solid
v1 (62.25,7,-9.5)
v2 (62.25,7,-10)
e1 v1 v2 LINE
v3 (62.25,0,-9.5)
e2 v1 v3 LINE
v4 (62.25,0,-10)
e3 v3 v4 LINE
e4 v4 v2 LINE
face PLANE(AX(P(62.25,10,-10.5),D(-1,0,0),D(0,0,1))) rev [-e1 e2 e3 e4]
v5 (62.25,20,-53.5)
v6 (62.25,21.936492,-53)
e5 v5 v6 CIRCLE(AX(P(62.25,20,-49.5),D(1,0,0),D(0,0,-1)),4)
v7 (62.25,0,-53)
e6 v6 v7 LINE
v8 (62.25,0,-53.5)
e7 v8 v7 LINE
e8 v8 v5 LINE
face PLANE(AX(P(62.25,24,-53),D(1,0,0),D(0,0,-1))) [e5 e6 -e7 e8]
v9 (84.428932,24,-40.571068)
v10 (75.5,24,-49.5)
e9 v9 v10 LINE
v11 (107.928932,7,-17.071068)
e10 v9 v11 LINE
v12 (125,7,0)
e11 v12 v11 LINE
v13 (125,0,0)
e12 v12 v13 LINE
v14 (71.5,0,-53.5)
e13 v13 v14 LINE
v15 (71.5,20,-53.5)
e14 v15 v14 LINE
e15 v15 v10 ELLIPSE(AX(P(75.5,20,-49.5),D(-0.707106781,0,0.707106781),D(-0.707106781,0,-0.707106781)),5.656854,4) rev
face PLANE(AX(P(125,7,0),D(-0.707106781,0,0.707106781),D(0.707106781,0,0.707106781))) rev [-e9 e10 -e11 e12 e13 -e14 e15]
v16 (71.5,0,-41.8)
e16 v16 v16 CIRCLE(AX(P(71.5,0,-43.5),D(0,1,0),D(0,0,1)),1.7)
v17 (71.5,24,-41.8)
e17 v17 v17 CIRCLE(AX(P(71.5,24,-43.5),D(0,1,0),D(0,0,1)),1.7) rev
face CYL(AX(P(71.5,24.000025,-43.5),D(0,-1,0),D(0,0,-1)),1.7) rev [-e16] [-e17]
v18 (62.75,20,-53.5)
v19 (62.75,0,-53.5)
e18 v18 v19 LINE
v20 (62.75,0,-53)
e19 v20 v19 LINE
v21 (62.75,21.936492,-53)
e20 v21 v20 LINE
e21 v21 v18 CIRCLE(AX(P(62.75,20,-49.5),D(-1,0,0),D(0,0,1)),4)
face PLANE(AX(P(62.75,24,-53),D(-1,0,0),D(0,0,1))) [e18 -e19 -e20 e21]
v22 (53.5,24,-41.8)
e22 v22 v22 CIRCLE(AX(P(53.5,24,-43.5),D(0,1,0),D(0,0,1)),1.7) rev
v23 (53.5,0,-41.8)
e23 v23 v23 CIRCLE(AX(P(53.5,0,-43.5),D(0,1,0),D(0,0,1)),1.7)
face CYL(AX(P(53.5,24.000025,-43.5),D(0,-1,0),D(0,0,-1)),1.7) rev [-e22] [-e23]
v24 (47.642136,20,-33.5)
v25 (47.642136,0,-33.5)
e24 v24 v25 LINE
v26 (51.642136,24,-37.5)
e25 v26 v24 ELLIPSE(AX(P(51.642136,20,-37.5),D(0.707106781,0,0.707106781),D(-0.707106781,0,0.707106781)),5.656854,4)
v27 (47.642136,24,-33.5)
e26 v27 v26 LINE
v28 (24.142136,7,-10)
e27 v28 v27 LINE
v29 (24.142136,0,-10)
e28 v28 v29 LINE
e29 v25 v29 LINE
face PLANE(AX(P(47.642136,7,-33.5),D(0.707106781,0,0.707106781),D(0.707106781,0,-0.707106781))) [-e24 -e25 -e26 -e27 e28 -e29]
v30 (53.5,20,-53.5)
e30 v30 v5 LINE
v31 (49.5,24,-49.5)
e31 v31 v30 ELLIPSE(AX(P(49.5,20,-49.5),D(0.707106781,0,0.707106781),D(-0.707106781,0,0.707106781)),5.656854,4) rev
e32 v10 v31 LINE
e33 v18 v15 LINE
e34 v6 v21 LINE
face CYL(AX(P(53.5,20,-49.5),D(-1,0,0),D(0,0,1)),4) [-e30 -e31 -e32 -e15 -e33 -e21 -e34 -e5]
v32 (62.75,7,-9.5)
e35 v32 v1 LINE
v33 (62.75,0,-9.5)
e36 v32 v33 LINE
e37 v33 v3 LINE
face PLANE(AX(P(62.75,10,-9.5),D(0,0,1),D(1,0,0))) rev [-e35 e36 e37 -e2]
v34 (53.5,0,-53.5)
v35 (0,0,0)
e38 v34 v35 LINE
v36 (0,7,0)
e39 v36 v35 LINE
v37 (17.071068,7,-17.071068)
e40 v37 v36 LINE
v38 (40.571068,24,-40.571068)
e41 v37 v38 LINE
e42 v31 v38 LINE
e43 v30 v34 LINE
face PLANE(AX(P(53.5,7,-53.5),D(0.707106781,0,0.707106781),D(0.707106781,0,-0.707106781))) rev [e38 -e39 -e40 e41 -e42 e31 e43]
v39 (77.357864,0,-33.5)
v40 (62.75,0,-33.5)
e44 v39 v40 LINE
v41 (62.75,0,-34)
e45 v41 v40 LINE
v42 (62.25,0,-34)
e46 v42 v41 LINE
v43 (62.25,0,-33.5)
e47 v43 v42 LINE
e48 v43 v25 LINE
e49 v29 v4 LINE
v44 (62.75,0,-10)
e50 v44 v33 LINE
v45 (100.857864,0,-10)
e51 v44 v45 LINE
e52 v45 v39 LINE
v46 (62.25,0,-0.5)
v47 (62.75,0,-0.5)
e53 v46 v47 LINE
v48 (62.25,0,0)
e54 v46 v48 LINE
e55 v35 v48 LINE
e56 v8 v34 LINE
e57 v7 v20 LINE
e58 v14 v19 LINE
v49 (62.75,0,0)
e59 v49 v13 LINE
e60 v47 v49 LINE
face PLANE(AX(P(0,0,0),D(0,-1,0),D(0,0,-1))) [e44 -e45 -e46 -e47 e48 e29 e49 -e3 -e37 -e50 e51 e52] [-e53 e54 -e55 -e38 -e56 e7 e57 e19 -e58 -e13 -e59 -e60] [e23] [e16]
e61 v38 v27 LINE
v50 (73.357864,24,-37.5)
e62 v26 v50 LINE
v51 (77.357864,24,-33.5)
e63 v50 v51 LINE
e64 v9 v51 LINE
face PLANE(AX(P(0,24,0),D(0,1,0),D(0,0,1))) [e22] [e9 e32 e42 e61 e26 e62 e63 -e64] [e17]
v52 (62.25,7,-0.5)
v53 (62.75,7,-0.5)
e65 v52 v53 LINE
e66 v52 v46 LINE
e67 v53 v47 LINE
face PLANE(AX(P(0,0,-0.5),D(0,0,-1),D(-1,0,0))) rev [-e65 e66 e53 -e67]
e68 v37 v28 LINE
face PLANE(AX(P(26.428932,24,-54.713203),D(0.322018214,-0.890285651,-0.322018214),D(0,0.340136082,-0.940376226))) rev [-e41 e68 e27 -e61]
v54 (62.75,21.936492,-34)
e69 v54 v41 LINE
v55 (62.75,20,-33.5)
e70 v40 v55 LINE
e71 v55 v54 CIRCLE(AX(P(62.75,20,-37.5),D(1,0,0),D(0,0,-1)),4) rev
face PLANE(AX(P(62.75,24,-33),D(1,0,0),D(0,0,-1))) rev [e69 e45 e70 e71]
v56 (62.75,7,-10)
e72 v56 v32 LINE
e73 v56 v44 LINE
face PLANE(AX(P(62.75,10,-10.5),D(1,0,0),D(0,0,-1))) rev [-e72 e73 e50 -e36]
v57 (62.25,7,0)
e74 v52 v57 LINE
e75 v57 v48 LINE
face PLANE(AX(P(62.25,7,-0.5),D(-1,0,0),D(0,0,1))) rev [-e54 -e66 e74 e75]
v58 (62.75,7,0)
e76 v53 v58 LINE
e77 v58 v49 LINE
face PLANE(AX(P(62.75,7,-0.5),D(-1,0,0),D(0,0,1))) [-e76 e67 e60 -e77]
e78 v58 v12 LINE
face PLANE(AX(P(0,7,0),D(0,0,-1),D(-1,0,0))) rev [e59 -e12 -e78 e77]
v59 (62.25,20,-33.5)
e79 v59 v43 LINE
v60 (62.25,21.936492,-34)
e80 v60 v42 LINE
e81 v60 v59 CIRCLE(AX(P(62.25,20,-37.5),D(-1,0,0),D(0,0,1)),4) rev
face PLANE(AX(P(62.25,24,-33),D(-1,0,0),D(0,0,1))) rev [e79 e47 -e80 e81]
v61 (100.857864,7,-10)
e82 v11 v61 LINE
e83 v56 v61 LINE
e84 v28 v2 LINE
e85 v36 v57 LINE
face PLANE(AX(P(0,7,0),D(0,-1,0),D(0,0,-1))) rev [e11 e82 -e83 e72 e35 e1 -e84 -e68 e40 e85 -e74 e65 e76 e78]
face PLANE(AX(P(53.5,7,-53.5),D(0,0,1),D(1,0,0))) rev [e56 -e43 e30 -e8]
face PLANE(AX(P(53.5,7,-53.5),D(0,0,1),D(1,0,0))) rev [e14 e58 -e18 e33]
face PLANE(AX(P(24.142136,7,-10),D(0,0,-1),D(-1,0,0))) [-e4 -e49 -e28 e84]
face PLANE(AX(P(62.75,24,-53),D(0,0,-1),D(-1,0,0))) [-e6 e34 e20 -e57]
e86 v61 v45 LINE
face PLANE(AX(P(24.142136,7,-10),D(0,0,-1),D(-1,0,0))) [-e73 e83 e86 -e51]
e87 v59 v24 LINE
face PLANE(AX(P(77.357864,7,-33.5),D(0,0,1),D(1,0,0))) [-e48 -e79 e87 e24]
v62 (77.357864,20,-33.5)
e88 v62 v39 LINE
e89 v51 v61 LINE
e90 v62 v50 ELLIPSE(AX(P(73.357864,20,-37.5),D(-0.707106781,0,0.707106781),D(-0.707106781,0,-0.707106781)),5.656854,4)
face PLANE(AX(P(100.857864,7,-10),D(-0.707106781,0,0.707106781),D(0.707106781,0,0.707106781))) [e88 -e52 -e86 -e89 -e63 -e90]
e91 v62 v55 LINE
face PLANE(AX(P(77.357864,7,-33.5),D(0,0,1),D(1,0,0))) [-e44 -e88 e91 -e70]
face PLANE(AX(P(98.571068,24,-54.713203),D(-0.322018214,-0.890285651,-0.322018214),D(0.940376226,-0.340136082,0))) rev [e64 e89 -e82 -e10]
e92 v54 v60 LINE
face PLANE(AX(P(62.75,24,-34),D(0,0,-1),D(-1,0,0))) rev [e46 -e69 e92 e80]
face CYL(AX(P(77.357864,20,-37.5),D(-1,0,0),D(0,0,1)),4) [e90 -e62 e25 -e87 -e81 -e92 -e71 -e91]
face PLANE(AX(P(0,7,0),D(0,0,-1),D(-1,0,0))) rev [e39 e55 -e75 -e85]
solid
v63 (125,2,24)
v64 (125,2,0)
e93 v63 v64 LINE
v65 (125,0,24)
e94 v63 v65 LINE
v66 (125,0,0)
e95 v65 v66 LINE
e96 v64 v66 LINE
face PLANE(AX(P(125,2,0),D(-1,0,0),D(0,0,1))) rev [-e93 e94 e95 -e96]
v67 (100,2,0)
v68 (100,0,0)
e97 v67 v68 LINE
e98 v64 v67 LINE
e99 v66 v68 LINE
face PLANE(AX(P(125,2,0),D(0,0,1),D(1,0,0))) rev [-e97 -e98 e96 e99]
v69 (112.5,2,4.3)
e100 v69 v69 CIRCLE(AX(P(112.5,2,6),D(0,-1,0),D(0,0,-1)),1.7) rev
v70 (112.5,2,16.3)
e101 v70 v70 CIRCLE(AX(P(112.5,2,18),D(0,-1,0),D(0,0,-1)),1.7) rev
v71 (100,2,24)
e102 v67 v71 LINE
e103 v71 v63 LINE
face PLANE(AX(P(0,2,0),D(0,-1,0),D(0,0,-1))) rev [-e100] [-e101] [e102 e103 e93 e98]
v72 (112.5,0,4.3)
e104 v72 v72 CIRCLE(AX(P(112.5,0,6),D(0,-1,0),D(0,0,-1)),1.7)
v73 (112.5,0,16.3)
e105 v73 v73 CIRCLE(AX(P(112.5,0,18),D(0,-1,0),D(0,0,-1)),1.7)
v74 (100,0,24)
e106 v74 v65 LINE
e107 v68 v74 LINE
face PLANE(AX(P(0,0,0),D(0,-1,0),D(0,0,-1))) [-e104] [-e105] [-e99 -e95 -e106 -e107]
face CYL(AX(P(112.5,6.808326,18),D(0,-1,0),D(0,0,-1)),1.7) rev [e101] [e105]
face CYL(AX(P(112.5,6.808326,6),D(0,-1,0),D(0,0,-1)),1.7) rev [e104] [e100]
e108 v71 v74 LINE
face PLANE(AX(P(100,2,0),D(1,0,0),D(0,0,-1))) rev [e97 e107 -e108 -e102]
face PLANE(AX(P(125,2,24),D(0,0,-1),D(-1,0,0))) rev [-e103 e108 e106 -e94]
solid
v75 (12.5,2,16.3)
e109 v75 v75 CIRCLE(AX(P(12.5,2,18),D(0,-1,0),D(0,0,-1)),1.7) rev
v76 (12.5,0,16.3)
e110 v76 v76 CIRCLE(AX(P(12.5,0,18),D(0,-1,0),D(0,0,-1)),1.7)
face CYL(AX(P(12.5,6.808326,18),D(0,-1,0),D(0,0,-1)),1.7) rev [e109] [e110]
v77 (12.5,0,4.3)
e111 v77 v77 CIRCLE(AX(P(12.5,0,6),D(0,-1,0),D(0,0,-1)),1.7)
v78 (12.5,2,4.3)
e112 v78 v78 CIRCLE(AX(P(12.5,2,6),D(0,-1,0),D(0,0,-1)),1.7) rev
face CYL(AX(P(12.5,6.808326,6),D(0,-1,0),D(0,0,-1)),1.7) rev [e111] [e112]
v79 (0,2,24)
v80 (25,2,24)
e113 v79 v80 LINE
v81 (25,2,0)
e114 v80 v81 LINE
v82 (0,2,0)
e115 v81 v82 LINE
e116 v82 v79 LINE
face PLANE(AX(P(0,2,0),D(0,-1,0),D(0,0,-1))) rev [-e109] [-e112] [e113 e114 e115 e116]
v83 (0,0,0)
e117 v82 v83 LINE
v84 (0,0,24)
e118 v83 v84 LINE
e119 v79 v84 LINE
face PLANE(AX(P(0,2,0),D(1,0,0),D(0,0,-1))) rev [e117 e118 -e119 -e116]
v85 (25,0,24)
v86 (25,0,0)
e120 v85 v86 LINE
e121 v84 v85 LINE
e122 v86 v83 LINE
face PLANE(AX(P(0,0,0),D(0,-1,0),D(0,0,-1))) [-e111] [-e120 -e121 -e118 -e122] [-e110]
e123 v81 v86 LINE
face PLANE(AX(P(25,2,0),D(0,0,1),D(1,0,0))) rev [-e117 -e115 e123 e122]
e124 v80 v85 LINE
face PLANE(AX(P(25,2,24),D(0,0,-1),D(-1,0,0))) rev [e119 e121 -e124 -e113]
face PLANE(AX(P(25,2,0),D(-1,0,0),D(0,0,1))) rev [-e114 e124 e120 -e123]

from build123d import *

# Parameters (mm, degrees)
BEARING_MOUNTS_W             = 25
BEARING_MOUNTS_H             = 24
BEARING_MOUNT_PLATES_DEPTH   = 2
BEARING_MOUNT_PLATES_2_DEPTH = 2
BRIDGE_DEPTH                 = 7
M3_BEARING_HOLES_R           = 1.7
BEARING_MOUNT_HOLES_DEPTH    = 2
SKETCH7_W                    = 0.5
SKETCH7_H                    = 7
ALIGNMENT_HELPER_1_DEPTH     = 0.5
SKETCH24_W                   = 0.5
SKETCH24_H                   = 1
ALIGNMENT_HELPER_1B_DEPTH    = 10
BELT_MOUNT_DEPTH             = 17
SKETCH8_R                    = 1.7
BELT_MOUNT_HOLES_DEPTH       = 139.069728761
ANGLE_LEFT_DEPTH             = 17
ANGLE_LEFT_CUT_DEPTH         = 30
ANGLE_RIGHT_DEPTH            = 17
ANGLE_RIGHT_CUT_DEPTH        = 30
SKETCH23_W                   = 0.5
SKETCH23_H                   = 1
ALIGNMENT_HELPER_2_DEPTH     = 139.069728761
FILLET5_R                    = 4
FILLET2_R                    = 4
SKETCH25_W                   = 0.5
SKETCH25_H                   = 1
ALIGNMENT_HELPER_2B_DEPTH    = 139.069728761


with BuildPart() as part:
    # Bearing Mounts → Bearing Mount Plates (new body)
    with BuildSketch(Plane(origin=(0, 0, 0), x_dir=(1, 0, 0), z_dir=(0, 1, 0))):
        with Locations((12.5, -12)):
            Rectangle(BEARING_MOUNTS_W, BEARING_MOUNTS_H)
    extrude(amount=BEARING_MOUNT_PLATES_DEPTH)


with BuildPart() as body_2:
    # Bearing Mounts → Bearing Mount Plates 2 (new body)
    with BuildSketch(Plane(origin=(0, 0, 0), x_dir=(1, 0, 0), z_dir=(0, 1, 0))):
        with Locations((112.5, -12)):
            Rectangle(BEARING_MOUNTS_W, BEARING_MOUNTS_H)
    extrude(amount=BEARING_MOUNT_PLATES_2_DEPTH)


with BuildPart() as body_3:
    # Triangle → Bridge (new body)
    with BuildSketch(Plane(origin=(0, 0, 0), x_dir=(1, 0, 0), z_dir=(0, 1, 0))):
        Polygon((0, 0), (125, 0), (71.5, 53.5), (53.5, 53.5), align=None)
        Polygon((24.142135624, 10), (100.857864376, 10), (77.357864376, 33.5), (47.642135624, 33.5), align=None, mode=Mode.SUBTRACT)
    extrude(amount=BRIDGE_DEPTH)

    # Sketch7 → Alignment helper 1 (cut)
    with BuildSketch(Plane.XY):
        with Locations((62.5, 3.5)):
            Rectangle(SKETCH7_W, SKETCH7_H)
    extrude(amount=-ALIGNMENT_HELPER_1_DEPTH, mode=Mode.SUBTRACT)

    # Sketch24 → Alignment helper 1b (cut)
    with BuildSketch(Plane.XZ):
        with Locations((62.5, -10)):
            Rectangle(SKETCH24_W, SKETCH24_H)
    extrude(amount=-ALIGNMENT_HELPER_1B_DEPTH, mode=Mode.SUBTRACT)

    # Sketch9 → Belt Mount (add)
    with BuildSketch(Plane(origin=(0, 7, 0), x_dir=(1, 0, 0), z_dir=(0, 1, 0))):
        Polygon((33.5, 33.5), (53.5, 53.5), (71.5, 53.5), (91.5, 33.5), align=None)
    extrude(amount=BELT_MOUNT_DEPTH)

    # Sketch8 → Belt Mount Holes (cut, through all)
    with BuildSketch(Plane(origin=(0, 0, 0), x_dir=(1, 0, 0), z_dir=(0, 1, 0))):
        with Locations(Location((53.5, 43.5, 0), (0, 0, 270))):
            Circle(SKETCH8_R)
        with Locations(Location((71.5, 43.5, 0), (0, 0, 270))):
            Circle(SKETCH8_R)
    extrude(amount=BELT_MOUNT_HOLES_DEPTH, mode=Mode.SUBTRACT)

    # Sketch14 → Angle Left (add)
    with BuildSketch(Plane(origin=(0, 7, 0), x_dir=(1, 0, 0), z_dir=(0, 1, 0))):
        Polygon((24.142135624, 10), (47.642135624, 33.5), (33.5, 33.5), (10, 10), align=None)
    extrude(amount=ANGLE_LEFT_DEPTH)

    # Sketch17 → Angle Left Cut (cut)
    with BuildSketch(Plane(origin=(7.071067812, 0, 7.071067812), x_dir=(0.7071067811865369, 0, -0.7071067811865581), z_dir=(0.7071067811865581, 0, 0.7071067811865369))):
        Polygon((57.376154339, 24), (24.142135624, 7), (10, 7), (10, 24), (24.142135624, 24), align=None)
    extrude(amount=-ANGLE_LEFT_CUT_DEPTH, mode=Mode.SUBTRACT)

    # Sketch20 → Angle Right (add)
    with BuildSketch(Plane(origin=(0, 7, 0), x_dir=(1, 0, 0), z_dir=(0, 1, 0))):
        Polygon((100.857864376, 10), (115, 10), (91.5, 33.5), (77.357864376, 33.5), align=None)
    extrude(amount=ANGLE_RIGHT_DEPTH)

    # Sketch21 → Angle Right Cut (cut)
    with BuildSketch(Plane(origin=(55.428932188, 0, -55.428932188), x_dir=(0.7071067811865511, 0, 0.707106781186544), z_dir=(-0.707106781186544, 0, 0.7071067811865511))):
        Polygon((31.012193309, 24), (64.246212025, 7), (78.388347648, 7), (78.388347648, 24), (64.246212025, 24), align=None)
    extrude(amount=-ANGLE_RIGHT_CUT_DEPTH, mode=Mode.SUBTRACT)

    # Sketch23 → Alignment helper 2 (cut, through all)
    with BuildSketch(Plane(origin=(0, 0, 0), x_dir=(1, 0, 0), z_dir=(0, 1, 0))):
        with Locations((62.5, 53.5)):
            Rectangle(SKETCH23_W, SKETCH23_H)
    extrude(amount=ALIGNMENT_HELPER_2_DEPTH, mode=Mode.SUBTRACT)

    # Fillet5
    # the kernel refuses this fillet: 4 mm, written as the material it takes off along each edge
    with BuildSketch(Plane(origin=(87.357864376, 24, -33.5), x_dir=(0, -1, 0), z_dir=(-1, 0, 0))) as fillet5_piece_1_section:
        with BuildLine():
            CenterArc((FILLET5_R, -FILLET5_R), FILLET5_R, 90, 90)
            Line((0, -FILLET5_R), (0, 0))
            Line((0, 0), (FILLET5_R, 0))
        make_face()
    fillet5_piece_1 = extrude(amount=49.715728753, mode=Mode.PRIVATE)
    fillet5_piece_1 = split(fillet5_piece_1, bisect_by=Plane(origin=(55.497209135, 23.062933131, -41.355073512), z_dir=(0.7071067811865583, 0, 0.7071067811865369)), keep=Keep.TOP, mode=Mode.PRIVATE)
    fillet5_piece_1 = split(fillet5_piece_1, bisect_by=Plane(origin=(69.502790865, 23.062933131, -41.355073512), z_dir=(-0.7071067811865436, 0, 0.7071067811865515)), keep=Keep.TOP, mode=Mode.PRIVATE)
    add(fillet5_piece_1, mode=Mode.SUBTRACT)

    # Fillet2
    # the kernel refuses this fillet: 4 mm, written as the material it takes off along each edge
    with BuildSketch(Plane(origin=(43.5, 24, -53.5), x_dir=(0, -1, 0), z_dir=(1, 0, 0)), Plane(origin=(52.75, 24, -53.5), x_dir=(0, -1, 0), z_dir=(1, 0, 0))) as fillet2_piece_1:
        with BuildLine():
            CenterArc((FILLET2_R, -FILLET2_R), FILLET2_R, 90, 90)
            Line((0, -FILLET2_R), (0, 0))
            Line((0, 0), (FILLET2_R, 0))
        make_face()
    extrude(amount=28.75, mode=Mode.SUBTRACT)

    # Sketch25 → Alignment helper 2b (cut, through all)
    with BuildSketch(Plane.XZ):
        with Locations((62.5, -33.5)):
            Rectangle(SKETCH25_W, SKETCH25_H)
    extrude(amount=-ALIGNMENT_HELPER_2B_DEPTH, mode=Mode.SUBTRACT)


with BuildPart() as bearing_mount_holes_tool:
    # M3 Bearing Holes → Bearing Mount Holes (new body)
    with BuildSketch(Plane.XZ):
        with Locations(Location((112.5, 6, 0), (0, 0, 270))):
            Circle(M3_BEARING_HOLES_R)
        with Locations(Location((112.5, 18, 0), (0, 0, 270))):
            Circle(M3_BEARING_HOLES_R)
        with Locations(Location((12.5, 6, 0), (0, 0, 270))):
            Circle(M3_BEARING_HOLES_R)
        with Locations(Location((12.5, 18, 0), (0, 0, 270))):
            Circle(M3_BEARING_HOLES_R)
    extrude(amount=-BEARING_MOUNT_HOLES_DEPTH)


with BuildPart() as part_1:
    add(part.part)

    # Bearing Mount Holes: cut by bearing_mount_holes_tool
    add(bearing_mount_holes_tool.part, mode=Mode.SUBTRACT)


with BuildPart() as body_2_1:
    add(body_2.part)

    # Bearing Mount Holes: cut by bearing_mount_holes_tool
    add(bearing_mount_holes_tool.part, mode=Mode.SUBTRACT)


solid = Compound([body_3.part, part_1.part, body_2_1.part])
